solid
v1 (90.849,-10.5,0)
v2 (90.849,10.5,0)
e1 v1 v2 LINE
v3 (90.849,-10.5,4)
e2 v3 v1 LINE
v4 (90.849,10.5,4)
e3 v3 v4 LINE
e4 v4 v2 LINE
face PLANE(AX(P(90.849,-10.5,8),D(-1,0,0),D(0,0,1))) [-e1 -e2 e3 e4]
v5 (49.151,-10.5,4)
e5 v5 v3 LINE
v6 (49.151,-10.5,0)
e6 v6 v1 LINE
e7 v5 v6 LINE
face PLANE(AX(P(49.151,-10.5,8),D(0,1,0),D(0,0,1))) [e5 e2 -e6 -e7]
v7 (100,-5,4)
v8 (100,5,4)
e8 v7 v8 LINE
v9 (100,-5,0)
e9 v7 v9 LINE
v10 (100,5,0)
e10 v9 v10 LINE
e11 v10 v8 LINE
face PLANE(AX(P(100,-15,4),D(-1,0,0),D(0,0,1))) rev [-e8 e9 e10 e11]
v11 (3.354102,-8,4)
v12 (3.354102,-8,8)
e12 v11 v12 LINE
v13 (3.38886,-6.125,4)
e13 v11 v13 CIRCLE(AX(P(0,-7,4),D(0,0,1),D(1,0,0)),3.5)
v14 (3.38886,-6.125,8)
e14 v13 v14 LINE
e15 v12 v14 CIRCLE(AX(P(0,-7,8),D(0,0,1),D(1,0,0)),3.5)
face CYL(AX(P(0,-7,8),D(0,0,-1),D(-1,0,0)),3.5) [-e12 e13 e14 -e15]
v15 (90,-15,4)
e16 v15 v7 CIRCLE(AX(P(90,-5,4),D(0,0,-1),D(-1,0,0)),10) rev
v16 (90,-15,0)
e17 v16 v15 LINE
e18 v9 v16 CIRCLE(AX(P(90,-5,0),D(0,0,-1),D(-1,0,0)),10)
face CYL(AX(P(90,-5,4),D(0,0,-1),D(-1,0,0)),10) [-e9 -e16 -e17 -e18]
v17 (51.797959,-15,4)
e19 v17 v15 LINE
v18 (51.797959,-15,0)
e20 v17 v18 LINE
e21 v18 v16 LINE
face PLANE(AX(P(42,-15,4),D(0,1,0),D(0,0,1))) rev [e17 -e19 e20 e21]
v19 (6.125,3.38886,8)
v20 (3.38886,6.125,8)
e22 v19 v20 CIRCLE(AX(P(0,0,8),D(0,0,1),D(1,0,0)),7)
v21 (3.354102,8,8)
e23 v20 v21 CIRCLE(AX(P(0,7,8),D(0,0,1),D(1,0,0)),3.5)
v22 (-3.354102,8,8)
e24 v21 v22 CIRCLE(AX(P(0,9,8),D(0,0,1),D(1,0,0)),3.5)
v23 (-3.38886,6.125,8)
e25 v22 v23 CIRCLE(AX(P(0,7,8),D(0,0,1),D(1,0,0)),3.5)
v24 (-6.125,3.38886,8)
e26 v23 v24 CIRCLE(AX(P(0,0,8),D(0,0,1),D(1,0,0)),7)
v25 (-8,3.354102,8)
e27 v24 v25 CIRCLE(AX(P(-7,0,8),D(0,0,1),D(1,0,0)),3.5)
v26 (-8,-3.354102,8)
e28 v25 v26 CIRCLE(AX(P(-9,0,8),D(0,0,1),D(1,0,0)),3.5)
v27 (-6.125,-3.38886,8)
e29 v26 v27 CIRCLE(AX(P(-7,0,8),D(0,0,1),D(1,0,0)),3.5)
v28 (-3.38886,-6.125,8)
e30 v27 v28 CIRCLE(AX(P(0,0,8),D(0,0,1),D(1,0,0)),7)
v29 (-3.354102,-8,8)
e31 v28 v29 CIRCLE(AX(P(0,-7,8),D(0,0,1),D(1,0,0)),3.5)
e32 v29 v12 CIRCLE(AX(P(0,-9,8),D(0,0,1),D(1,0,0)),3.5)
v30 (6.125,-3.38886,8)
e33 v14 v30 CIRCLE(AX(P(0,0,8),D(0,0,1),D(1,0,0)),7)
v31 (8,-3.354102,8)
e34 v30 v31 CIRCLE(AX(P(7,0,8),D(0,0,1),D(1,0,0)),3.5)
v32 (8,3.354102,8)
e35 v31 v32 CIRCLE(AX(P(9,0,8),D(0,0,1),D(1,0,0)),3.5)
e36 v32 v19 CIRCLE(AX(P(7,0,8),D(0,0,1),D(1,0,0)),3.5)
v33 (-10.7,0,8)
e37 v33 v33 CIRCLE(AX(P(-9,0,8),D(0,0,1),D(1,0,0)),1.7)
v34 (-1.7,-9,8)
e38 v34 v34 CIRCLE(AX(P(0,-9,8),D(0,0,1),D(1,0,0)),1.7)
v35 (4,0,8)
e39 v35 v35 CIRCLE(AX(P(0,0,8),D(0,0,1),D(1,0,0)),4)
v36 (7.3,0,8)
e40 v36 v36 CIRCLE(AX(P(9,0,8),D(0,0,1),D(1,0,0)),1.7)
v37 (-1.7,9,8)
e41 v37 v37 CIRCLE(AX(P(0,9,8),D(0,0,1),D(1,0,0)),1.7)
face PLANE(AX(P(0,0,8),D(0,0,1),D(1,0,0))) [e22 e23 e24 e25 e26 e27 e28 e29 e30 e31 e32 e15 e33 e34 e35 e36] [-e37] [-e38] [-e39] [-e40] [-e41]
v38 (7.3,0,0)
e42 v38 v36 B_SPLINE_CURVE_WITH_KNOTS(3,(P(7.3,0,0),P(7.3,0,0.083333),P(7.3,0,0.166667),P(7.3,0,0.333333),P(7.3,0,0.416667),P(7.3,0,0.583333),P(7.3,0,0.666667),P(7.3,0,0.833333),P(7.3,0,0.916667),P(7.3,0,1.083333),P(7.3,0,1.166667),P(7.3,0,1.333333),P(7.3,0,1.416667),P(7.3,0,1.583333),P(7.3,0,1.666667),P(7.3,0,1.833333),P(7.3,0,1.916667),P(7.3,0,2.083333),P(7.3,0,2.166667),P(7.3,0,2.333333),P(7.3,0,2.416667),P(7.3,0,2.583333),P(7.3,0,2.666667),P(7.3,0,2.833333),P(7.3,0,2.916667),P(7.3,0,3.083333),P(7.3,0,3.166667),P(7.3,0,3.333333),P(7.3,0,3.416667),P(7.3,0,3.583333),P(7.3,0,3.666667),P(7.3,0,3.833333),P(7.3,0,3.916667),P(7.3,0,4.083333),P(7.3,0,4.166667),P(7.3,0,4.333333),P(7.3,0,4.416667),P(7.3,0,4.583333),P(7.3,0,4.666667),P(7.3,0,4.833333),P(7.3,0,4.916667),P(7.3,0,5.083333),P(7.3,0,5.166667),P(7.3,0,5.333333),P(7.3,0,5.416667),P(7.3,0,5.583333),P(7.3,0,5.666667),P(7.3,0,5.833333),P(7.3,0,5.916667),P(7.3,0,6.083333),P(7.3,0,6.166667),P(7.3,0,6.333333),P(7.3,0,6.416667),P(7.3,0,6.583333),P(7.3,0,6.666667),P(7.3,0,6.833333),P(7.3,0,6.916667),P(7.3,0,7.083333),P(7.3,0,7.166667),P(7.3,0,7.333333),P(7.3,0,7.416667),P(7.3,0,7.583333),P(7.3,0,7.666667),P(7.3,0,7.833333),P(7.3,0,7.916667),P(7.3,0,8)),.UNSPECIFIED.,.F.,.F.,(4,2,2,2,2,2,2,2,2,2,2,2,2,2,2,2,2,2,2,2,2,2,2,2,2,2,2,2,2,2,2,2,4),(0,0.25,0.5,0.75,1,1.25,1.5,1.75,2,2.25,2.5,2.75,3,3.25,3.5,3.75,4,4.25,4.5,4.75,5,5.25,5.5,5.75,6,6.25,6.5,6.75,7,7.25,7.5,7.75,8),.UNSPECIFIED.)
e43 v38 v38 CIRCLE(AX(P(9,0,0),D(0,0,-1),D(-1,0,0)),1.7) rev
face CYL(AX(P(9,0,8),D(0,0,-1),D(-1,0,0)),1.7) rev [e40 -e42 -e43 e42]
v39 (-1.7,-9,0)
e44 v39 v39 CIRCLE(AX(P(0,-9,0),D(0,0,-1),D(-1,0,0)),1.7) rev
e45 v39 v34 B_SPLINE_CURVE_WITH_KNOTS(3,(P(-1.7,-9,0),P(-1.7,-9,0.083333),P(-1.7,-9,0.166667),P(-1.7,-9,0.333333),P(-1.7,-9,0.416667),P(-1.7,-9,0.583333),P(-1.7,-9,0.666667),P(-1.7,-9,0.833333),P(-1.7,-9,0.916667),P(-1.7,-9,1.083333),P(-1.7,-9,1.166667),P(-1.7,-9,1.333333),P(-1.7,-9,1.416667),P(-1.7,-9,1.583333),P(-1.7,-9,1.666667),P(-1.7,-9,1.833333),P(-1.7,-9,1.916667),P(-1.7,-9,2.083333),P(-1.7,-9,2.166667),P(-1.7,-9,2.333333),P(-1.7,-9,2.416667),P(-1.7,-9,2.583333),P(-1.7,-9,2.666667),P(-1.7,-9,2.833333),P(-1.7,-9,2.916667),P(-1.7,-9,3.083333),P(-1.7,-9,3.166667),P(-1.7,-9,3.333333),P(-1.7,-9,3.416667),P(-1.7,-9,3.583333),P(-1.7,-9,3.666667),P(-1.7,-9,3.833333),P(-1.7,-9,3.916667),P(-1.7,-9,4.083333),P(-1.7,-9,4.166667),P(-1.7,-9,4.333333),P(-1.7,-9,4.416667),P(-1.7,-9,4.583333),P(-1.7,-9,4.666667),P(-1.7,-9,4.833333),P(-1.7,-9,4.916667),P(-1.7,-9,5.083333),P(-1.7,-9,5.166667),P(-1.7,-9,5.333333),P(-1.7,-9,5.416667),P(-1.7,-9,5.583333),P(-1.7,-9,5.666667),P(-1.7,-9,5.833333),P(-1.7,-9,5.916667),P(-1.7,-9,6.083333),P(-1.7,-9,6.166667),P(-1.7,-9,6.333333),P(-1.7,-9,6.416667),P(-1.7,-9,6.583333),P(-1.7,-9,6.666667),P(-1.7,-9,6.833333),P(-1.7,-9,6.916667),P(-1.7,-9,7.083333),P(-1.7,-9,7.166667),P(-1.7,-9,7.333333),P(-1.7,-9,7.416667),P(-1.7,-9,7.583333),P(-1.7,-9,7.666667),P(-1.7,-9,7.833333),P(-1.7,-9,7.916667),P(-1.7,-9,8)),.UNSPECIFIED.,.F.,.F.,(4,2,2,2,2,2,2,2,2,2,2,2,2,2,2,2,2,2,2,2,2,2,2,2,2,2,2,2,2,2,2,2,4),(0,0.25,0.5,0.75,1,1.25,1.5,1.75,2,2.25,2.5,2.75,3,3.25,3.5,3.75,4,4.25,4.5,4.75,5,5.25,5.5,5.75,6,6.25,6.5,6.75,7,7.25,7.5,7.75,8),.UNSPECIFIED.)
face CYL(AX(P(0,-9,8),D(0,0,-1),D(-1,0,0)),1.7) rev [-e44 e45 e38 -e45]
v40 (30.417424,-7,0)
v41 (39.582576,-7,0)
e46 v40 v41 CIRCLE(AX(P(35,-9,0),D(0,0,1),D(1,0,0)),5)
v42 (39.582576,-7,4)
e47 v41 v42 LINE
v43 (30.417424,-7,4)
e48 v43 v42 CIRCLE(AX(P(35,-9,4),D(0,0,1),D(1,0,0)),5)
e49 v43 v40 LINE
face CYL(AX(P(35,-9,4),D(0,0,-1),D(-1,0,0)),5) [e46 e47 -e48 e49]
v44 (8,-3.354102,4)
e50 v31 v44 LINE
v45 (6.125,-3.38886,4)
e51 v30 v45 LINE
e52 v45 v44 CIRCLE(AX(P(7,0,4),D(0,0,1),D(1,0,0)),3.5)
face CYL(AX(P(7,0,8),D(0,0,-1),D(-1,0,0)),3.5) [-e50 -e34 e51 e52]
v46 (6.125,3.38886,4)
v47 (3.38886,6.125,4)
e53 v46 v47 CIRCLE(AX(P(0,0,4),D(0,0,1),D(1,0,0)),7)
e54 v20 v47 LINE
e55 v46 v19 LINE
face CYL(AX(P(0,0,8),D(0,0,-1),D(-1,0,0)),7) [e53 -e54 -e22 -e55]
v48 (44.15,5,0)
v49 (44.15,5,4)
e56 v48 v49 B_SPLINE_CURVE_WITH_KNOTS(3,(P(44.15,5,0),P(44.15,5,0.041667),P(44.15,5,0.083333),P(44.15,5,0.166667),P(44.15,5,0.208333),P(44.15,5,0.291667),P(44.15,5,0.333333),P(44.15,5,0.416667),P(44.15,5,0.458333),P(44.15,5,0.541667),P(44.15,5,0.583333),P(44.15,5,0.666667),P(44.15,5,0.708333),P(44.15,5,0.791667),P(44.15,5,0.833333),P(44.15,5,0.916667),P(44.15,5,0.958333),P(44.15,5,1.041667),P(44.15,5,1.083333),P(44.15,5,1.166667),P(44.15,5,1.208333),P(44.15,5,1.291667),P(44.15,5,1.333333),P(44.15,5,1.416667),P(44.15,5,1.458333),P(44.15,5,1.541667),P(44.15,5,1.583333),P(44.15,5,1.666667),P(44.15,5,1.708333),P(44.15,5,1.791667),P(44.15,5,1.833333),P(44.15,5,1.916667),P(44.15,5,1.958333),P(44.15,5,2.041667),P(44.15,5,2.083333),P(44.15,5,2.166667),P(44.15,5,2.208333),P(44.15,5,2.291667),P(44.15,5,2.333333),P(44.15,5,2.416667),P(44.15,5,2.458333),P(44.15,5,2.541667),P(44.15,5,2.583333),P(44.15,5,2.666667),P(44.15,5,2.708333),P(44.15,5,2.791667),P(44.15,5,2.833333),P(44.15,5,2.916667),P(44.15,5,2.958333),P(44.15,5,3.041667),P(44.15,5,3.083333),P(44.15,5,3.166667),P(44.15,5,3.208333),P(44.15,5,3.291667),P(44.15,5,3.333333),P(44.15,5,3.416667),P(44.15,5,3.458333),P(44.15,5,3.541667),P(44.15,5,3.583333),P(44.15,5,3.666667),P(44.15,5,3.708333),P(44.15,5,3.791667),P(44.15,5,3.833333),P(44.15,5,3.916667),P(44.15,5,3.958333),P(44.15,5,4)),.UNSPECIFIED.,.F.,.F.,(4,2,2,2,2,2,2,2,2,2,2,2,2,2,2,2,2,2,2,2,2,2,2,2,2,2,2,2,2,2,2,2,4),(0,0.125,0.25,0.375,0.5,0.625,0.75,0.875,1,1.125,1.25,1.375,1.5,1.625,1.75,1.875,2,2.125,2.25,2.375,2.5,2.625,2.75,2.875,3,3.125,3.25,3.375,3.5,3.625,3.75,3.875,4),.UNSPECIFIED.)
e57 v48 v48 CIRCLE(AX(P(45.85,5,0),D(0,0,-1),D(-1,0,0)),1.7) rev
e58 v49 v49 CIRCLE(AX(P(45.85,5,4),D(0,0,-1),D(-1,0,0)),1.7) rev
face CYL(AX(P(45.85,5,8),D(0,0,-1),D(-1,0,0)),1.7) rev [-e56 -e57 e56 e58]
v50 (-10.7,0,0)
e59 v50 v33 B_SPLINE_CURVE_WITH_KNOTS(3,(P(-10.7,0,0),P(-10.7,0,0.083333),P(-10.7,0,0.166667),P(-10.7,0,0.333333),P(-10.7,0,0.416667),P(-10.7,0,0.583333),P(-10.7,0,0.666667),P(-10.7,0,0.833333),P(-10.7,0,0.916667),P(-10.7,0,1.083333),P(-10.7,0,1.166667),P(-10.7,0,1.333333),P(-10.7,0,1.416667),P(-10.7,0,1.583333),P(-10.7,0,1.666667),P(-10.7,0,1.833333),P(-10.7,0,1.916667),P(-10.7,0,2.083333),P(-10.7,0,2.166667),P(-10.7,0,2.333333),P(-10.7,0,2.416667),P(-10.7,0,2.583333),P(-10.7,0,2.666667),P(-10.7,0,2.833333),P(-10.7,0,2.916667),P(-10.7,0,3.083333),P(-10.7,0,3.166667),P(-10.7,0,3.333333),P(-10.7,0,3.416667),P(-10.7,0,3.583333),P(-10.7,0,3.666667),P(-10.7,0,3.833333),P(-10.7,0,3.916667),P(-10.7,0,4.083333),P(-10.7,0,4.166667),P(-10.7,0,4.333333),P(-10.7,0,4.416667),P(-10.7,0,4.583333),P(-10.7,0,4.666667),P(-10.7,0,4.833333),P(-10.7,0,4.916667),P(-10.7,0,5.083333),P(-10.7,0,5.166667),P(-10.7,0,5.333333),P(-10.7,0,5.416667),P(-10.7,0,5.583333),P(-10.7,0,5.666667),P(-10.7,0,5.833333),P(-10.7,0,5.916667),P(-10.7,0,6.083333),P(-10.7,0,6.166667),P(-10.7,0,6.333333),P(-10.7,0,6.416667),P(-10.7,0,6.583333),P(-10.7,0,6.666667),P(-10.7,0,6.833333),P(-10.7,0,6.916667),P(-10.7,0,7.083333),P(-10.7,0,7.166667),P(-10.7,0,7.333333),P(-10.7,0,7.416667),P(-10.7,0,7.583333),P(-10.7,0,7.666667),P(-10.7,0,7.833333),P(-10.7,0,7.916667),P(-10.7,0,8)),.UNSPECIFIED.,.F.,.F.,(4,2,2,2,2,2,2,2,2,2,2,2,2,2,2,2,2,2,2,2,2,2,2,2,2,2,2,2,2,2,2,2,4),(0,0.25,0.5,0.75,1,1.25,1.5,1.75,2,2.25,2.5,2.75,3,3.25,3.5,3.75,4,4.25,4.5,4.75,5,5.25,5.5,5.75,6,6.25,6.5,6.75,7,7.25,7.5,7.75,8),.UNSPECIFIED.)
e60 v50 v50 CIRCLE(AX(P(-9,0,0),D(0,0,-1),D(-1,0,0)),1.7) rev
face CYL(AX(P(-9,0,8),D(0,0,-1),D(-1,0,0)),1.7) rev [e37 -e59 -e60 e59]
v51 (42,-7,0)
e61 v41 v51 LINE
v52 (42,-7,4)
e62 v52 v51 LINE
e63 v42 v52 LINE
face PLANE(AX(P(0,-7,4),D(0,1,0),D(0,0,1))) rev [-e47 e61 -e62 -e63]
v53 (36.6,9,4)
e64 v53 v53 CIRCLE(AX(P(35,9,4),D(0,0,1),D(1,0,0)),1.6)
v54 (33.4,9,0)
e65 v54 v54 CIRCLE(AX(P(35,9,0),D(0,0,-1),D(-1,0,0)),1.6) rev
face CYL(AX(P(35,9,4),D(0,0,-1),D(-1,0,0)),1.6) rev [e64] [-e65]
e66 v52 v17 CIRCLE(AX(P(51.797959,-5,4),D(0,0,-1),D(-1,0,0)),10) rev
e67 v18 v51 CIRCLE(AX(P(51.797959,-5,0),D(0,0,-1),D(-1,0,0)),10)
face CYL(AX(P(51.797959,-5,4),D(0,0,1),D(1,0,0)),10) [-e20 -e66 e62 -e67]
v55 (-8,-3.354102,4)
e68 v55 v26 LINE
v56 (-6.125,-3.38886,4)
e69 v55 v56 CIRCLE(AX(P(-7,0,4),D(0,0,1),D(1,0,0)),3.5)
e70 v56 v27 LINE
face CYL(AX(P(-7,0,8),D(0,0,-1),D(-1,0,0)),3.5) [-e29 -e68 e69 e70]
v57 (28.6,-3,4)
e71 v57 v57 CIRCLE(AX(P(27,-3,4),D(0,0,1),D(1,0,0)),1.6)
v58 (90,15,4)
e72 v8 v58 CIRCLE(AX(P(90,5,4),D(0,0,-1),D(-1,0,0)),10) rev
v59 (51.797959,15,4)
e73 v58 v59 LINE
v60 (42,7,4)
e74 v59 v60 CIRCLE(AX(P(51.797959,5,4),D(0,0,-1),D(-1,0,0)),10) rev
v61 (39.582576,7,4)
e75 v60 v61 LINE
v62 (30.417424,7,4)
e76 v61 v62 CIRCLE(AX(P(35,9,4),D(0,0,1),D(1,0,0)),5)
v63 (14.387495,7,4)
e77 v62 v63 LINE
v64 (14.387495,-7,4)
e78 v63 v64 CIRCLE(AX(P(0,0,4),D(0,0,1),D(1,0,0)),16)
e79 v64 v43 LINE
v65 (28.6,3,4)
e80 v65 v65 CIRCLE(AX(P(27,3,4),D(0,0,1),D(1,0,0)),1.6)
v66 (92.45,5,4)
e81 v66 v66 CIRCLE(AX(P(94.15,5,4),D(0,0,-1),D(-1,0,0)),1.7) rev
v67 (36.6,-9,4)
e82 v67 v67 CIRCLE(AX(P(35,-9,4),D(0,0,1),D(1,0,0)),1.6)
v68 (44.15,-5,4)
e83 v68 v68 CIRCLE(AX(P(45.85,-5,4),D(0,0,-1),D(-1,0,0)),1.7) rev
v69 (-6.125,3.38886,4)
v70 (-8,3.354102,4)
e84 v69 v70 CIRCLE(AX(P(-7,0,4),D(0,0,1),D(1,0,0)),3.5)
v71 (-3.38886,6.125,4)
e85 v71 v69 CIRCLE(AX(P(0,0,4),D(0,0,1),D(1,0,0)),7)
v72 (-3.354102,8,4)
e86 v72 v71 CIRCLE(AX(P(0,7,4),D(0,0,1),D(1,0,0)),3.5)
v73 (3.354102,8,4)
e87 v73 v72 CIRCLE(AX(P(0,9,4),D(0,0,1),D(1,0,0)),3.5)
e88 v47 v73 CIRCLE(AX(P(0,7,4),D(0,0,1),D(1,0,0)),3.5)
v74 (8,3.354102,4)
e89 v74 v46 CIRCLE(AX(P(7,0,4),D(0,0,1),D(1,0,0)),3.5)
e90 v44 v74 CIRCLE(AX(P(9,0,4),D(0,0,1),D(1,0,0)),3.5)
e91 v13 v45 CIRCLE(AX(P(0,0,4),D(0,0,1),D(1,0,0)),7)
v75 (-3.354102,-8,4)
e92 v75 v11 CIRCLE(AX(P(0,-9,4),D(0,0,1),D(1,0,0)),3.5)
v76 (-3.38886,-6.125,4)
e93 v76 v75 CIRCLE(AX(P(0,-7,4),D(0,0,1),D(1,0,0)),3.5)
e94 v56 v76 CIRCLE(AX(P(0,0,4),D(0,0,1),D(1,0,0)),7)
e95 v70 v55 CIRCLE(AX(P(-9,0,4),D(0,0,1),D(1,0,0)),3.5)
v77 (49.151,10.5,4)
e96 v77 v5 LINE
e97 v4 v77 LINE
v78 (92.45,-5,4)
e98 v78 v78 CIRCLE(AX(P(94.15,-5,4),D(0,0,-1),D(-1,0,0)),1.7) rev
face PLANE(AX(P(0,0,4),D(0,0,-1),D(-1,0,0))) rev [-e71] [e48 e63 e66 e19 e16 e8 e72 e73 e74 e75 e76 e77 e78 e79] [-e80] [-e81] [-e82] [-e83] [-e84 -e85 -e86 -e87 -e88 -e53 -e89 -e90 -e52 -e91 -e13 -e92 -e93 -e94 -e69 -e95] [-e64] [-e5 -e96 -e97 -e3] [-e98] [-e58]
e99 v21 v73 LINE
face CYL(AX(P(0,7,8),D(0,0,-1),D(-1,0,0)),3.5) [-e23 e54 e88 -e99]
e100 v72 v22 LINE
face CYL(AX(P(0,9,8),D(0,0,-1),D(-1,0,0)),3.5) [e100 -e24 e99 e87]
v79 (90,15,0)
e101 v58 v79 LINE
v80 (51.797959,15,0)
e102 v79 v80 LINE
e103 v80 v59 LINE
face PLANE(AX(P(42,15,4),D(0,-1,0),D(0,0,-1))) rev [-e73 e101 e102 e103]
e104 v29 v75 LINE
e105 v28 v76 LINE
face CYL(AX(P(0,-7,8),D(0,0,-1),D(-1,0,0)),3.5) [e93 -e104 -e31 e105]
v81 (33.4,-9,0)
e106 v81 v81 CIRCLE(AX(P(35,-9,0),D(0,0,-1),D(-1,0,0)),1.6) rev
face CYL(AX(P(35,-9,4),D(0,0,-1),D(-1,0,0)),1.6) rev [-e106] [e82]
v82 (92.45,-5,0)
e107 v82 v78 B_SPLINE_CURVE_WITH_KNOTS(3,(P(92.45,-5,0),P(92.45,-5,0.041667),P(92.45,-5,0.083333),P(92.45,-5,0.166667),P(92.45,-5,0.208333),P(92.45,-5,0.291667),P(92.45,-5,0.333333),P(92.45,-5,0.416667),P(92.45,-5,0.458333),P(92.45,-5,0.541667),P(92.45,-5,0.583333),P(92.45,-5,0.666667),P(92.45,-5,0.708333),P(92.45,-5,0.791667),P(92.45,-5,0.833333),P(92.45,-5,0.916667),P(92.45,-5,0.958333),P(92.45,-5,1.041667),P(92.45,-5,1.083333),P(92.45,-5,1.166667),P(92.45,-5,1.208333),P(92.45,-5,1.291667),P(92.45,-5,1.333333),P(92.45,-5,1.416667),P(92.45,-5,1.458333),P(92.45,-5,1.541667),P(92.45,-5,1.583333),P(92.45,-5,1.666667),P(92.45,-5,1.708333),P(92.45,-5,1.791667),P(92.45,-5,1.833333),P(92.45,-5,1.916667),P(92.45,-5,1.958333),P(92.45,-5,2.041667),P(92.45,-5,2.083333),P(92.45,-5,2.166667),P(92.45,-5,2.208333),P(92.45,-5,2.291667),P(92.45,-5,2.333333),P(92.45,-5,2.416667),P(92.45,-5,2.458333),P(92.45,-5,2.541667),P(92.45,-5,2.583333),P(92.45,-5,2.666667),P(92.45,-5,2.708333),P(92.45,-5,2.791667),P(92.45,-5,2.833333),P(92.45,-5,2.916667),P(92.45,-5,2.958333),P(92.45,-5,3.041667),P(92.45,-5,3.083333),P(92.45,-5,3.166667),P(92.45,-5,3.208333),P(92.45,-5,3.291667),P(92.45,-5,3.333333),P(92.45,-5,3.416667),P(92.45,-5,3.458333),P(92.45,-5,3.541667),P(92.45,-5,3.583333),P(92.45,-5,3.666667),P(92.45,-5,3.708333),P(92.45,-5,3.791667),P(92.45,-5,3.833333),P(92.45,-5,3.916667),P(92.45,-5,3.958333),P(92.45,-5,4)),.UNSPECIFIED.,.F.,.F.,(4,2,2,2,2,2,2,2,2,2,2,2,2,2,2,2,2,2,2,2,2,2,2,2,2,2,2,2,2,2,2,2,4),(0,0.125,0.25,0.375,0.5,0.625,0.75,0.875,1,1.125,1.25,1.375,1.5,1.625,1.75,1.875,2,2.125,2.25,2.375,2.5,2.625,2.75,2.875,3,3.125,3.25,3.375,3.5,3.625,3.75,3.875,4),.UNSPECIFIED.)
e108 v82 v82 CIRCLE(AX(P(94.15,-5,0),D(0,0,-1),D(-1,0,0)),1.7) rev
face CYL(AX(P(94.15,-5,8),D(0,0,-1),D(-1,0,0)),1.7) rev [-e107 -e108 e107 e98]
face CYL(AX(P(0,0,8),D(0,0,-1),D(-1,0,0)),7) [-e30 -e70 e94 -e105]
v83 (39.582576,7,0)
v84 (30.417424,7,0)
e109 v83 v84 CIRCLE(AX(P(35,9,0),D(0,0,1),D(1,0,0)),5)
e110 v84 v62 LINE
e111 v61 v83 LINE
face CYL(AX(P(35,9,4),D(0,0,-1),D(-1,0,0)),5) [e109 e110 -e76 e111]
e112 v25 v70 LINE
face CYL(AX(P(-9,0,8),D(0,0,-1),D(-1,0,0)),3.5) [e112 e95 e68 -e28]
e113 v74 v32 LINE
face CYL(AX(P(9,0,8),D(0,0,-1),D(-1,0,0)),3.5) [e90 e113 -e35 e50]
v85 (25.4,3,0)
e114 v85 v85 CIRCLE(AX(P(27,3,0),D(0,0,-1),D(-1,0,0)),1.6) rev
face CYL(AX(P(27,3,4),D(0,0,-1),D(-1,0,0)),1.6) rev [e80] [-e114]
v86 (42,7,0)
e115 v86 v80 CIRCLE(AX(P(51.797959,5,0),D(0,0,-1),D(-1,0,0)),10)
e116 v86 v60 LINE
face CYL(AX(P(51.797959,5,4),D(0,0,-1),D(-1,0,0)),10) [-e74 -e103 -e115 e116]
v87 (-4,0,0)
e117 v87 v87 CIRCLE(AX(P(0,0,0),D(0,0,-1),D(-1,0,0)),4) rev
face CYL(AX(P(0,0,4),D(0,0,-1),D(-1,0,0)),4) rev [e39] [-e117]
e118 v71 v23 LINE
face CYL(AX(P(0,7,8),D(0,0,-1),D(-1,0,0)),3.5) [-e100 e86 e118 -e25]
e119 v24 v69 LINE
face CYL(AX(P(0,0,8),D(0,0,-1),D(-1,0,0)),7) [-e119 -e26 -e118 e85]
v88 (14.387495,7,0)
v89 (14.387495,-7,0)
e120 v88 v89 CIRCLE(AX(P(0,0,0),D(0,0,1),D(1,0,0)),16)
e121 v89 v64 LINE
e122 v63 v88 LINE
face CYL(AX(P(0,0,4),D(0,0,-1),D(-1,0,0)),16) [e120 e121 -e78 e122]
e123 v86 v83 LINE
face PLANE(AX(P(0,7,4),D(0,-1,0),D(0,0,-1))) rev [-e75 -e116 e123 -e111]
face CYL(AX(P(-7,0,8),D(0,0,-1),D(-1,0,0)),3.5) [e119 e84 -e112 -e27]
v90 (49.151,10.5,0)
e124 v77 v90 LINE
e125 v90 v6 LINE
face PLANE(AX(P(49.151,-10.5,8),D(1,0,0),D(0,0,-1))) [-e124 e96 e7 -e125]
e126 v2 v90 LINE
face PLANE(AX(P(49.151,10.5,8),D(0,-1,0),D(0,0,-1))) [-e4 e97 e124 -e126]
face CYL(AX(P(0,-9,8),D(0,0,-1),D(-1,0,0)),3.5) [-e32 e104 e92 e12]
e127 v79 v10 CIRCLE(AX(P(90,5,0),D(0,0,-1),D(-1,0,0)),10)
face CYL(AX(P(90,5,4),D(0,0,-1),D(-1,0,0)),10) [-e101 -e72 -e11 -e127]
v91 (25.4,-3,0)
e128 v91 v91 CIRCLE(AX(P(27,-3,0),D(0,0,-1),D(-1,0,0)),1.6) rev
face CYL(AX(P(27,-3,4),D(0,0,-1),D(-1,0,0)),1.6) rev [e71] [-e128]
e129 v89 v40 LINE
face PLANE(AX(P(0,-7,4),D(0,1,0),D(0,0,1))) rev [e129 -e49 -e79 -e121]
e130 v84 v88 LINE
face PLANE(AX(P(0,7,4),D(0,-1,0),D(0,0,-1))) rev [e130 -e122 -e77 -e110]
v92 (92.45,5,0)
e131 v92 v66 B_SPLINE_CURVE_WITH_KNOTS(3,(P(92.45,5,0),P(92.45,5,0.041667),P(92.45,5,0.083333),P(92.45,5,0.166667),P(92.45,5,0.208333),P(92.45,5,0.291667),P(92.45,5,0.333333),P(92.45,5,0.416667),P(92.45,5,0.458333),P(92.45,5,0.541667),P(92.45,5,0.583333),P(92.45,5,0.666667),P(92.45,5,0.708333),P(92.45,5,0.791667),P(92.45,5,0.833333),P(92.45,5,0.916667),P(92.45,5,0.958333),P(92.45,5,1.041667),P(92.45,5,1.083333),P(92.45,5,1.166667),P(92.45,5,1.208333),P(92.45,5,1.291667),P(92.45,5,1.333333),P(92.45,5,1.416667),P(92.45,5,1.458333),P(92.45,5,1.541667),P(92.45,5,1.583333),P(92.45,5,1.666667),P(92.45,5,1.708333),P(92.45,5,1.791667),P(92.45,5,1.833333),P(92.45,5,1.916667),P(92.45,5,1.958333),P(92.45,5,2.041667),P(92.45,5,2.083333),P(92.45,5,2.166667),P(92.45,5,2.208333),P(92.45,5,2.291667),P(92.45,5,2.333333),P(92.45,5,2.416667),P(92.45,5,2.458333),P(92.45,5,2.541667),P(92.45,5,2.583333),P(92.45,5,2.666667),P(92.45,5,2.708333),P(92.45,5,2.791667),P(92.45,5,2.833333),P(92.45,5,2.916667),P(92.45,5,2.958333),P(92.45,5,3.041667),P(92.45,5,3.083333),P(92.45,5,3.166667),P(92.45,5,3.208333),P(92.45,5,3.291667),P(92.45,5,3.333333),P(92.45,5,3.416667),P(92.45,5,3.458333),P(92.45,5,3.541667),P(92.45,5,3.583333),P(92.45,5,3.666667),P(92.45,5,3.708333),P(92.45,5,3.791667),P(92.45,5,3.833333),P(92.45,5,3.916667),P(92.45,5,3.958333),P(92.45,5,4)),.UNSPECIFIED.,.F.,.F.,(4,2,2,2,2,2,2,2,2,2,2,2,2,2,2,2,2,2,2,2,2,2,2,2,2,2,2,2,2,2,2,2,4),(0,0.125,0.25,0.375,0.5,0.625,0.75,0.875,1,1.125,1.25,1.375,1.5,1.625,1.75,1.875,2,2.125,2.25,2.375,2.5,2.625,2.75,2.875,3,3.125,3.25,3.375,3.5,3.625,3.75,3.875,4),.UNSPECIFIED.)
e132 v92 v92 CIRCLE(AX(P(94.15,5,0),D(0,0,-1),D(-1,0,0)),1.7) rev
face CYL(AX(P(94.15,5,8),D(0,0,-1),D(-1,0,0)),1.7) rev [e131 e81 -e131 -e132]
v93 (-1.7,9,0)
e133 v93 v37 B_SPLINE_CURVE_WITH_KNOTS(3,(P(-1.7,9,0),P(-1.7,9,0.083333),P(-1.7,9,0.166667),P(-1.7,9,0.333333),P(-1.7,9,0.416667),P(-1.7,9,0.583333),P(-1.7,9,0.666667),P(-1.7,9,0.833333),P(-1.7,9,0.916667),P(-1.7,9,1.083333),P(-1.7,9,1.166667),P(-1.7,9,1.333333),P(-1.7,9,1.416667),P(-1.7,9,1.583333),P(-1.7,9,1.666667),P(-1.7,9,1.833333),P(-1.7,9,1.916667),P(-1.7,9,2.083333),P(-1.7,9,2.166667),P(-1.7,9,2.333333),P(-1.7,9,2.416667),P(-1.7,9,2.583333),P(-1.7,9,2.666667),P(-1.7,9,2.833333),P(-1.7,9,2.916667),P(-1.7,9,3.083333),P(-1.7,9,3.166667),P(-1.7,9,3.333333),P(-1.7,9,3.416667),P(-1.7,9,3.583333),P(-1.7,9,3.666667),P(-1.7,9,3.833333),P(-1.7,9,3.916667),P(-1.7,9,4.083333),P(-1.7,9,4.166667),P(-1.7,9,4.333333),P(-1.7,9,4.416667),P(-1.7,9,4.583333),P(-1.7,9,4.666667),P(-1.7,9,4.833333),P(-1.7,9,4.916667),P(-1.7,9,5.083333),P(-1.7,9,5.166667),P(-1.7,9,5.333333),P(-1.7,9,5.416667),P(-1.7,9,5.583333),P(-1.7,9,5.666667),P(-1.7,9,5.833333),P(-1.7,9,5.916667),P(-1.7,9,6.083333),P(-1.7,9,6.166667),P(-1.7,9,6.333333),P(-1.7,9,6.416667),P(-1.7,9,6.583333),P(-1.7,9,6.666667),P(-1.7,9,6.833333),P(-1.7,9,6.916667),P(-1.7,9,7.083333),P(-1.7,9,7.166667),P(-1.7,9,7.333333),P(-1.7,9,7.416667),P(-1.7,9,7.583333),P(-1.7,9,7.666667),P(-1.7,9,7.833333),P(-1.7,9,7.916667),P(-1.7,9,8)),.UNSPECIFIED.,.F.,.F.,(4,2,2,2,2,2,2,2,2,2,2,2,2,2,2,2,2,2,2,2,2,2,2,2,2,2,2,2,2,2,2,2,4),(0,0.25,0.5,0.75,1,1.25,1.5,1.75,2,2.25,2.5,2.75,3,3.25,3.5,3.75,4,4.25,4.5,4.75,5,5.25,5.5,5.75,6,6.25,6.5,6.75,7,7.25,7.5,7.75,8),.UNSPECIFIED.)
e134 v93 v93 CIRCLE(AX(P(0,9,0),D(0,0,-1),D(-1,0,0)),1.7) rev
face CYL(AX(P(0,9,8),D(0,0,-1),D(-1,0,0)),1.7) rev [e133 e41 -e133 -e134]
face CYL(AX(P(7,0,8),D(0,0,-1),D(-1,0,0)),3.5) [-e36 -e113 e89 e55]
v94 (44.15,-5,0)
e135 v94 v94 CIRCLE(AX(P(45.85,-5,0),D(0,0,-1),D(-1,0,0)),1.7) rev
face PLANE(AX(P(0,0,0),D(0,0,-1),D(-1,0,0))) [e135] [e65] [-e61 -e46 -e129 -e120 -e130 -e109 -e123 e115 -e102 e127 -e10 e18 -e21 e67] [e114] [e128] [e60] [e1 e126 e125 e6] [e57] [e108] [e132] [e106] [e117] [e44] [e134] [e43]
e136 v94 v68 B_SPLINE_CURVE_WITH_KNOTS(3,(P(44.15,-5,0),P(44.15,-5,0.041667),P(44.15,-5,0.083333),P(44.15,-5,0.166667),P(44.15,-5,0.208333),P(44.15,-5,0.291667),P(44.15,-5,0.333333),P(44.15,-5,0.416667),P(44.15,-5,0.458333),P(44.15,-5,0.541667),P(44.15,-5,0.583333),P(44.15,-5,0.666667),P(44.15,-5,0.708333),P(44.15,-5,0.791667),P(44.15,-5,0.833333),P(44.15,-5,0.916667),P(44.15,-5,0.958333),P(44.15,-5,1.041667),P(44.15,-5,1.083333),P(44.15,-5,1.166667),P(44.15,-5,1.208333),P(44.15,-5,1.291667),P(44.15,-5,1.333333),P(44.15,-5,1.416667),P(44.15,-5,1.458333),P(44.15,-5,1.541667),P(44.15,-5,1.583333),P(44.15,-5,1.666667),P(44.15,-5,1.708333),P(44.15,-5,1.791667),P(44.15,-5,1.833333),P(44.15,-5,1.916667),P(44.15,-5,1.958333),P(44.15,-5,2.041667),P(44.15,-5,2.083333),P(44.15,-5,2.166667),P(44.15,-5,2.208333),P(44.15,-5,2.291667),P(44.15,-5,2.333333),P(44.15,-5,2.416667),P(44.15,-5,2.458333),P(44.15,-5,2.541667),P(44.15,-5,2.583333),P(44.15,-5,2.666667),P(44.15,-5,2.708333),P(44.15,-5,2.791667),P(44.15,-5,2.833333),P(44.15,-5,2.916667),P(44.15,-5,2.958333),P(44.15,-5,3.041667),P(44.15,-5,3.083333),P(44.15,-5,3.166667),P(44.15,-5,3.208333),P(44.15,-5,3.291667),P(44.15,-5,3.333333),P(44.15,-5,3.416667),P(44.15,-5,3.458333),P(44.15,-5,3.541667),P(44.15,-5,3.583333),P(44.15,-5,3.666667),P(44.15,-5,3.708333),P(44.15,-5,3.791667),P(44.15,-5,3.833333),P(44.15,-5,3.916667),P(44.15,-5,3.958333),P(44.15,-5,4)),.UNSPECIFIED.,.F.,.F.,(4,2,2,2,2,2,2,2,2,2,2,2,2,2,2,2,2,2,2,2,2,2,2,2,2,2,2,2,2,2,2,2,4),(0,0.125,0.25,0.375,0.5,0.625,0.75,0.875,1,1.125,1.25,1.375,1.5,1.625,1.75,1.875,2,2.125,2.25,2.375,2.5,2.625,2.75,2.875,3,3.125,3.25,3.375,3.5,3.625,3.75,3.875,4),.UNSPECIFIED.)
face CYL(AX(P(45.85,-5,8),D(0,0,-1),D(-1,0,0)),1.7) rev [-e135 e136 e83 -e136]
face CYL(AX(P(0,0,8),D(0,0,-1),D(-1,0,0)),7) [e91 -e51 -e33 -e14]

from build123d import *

# Parameters (mm, degrees)
MAIN_WEB_PROFILE_W                             = 60
MAIN_WEB_PROFILE_H                             = 14
MAIN_WEB_DEPTH                                 = 4
SHOULDER_HORN_FLANGE_PROFILE_R                 = 16
SHOULDER_HORN_FLANGE_DEPTH                     = 4
ELBOW_SERVO_MOUNT_PROFILE_W                    = 48
ELBOW_SERVO_MOUNT_PROFILE_H                    = 28
ELBOW_SERVO_MOUNT_DEPTH                        = 4
SG90_BODY_CLEARANCE_START                      = -5
SG90_BODY_CLEARANCE_PROFILE_W                  = 23.8
SG90_BODY_CLEARANCE_PROFILE_H                  = 13
SG90_BODY_CLEARANCE_DEPTH                      = 97.49863387
ELBOW_TAB_FASTENERS_START                      = -50
ELBOW_TAB_FASTENERS_PROFILE_R                  = 1.3
ELBOW_TAB_FASTENERS_DEPTH                      = 142.49863387
SHOULDER_CENTER_SCREW_ACCESS_START             = -50
SHOULDER_CENTER_SCREW_ACCESS_PROFILE_R         = 4
SHOULDER_CENTER_SCREW_ACCESS_DEPTH             = 142.49863387
CABLE_TIE_HOLES_START                          = -50
CABLE_TIE_HOLES_PROFILE_R                      = 1.6
CABLE_TIE_HOLES_DEPTH                          = 142.49863387
PASSIVE_LOWER_MOUNT_BOSS_PROFILE_R             = 5
PASSIVE_LOWER_MOUNT_BOSS_DEPTH                 = 4
PASSIVE_UPPER_MOUNT_BOSS_PROFILE_R             = 5
PASSIVE_UPPER_MOUNT_BOSS_DEPTH                 = 4
PASSIVE_CHEEK_STANDOFFS_START                  = -50
PASSIVE_CHEEK_STANDOFFS_PROFILE_R              = 1.6
PASSIVE_CHEEK_STANDOFFS_DEPTH                  = 142.49863387
SHOULDER_DOWEL_SUPPORT_HUB_START               = 4
SHOULDER_DOWEL_SUPPORT_HUB_PROFILE_R           = 7
SHOULDER_DOWEL_SUPPORT_HUB_PROFILE_R_2         = 4
SHOULDER_DOWEL_SUPPORT_HUB_DEPTH               = 4
RAISED_M3_WASHER_SEATS_HEIGHT8_START           = 4
RAISED_M3_WASHER_SEATS_PCD14_PROFILE_R         = 3.5
RAISED_M3_WASHER_SEATS_HEIGHT8_DEPTH           = 4
RESTORE_SHOULDER_SLEEVE_BORE_START             = -50
RESTORE_SHOULDER_SLEEVE_BORE_PROFILE_R         = 4
RESTORE_SHOULDER_SLEEVE_BORE_DEPTH             = 142.760557976
FILLET1_R                                      = 7.5
LARGER_ELBOW_SERVO_MOUNT_REPLACES_SG_2_W       = 58
LARGER_ELBOW_SERVO_MOUNT_REPLACES_SG_2_H       = 30
LARGER_ELBOW_SERVO_MOUNT_REPLACES_SG90_O_DEPTH = 4
FILLET2_R                                      = 10
OWNED_MG996R_ELBOW_BODY_WINDOW_START           = -5
OWNED_MG996R_ELBOW_BODY_WINDOW_PROFILE_W       = 41.698
OWNED_MG996R_ELBOW_BODY_WINDOW_PROFILE_H       = 21
OWNED_MG996R_ELBOW_BODY_WINDOW_DEPTH           = 107.587400794
OWNED_MG996R_ELBOW_M3_EAR_HOLES_START          = -50
OWNED_MG996R_ELBOW_M3_EAR_HOLES_PROFILE_R      = 1.7
OWNED_MG996R_ELBOW_M3_EAR_HOLES_DEPTH          = 152.587400794
PRINTED_HUB_M3_WASHER_SEATS_PCD18_START        = 4
PRINTED_HUB_WASHER_SEATS_PCD18_PROFILE_R       = 3.5
PRINTED_HUB_M3_WASHER_SEATS_PCD18_DEPTH        = 4
PRINTED_HUB_M3_CLEARANCE_PCD18_START           = -50
PRINTED_HUB_M3_CLEARANCE_PCD18_PROFILE_R       = 1.7
PRINTED_HUB_M3_CLEARANCE_PCD18_DEPTH           = 152.587400794


with BuildPart() as part:
    # Main_web_profile → Main_web (new body)
    with BuildSketch(Plane.XY):
        with Locations((30, 0)):
            Rectangle(MAIN_WEB_PROFILE_W, MAIN_WEB_PROFILE_H)
    extrude(amount=MAIN_WEB_DEPTH)

    # Shoulder_horn_flange_profile → Shoulder_horn_flange (add)
    with BuildSketch(Plane.XY):
        Circle(SHOULDER_HORN_FLANGE_PROFILE_R)
    extrude(amount=SHOULDER_HORN_FLANGE_DEPTH)

    # Elbow_servo_mount_profile → Elbow_servo_mount (add)
    with BuildSketch(Plane.XY):
        with Locations((66, 0)):
            Rectangle(ELBOW_SERVO_MOUNT_PROFILE_W, ELBOW_SERVO_MOUNT_PROFILE_H)
    extrude(amount=ELBOW_SERVO_MOUNT_DEPTH)

    # SG90_body_clearance_profile → SG90_body_clearance (cut, through all)
    with BuildSketch(Plane.XY.offset(SG90_BODY_CLEARANCE_START)):
        with Locations((65.5, 0)):
            Rectangle(SG90_BODY_CLEARANCE_PROFILE_W, SG90_BODY_CLEARANCE_PROFILE_H)
    extrude(amount=SG90_BODY_CLEARANCE_DEPTH, mode=Mode.SUBTRACT)

    # Elbow_tab_fasteners_profile → Elbow_tab_fasteners (cut, through all)
    with BuildSketch(Plane.XY.offset(ELBOW_TAB_FASTENERS_START)):
        with Locations(Location((51, 0, 0), (0, 0, 180))):
            Circle(ELBOW_TAB_FASTENERS_PROFILE_R)
        with Locations(Location((80, 0, 0), (0, 0, 180))):
            Circle(ELBOW_TAB_FASTENERS_PROFILE_R)
    extrude(amount=ELBOW_TAB_FASTENERS_DEPTH, mode=Mode.SUBTRACT)

    # Shoulder_center_screw_access_profile → Shoulder_center_screw_access (cut, through all)
    with BuildSketch(Plane.XY.offset(SHOULDER_CENTER_SCREW_ACCESS_START)):
        with Locations(Location((0, 0, 0), (0, 0, 180))):
            Circle(SHOULDER_CENTER_SCREW_ACCESS_PROFILE_R)
    extrude(amount=SHOULDER_CENTER_SCREW_ACCESS_DEPTH, mode=Mode.SUBTRACT)

    # Cable_tie_holes_profile → Cable_tie_holes (cut, through all)
    with BuildSketch(Plane.XY.offset(CABLE_TIE_HOLES_START)):
        with Locations(Location((27, -3, 0), (0, 0, 180))):
            Circle(CABLE_TIE_HOLES_PROFILE_R)
        with Locations(Location((27, 3, 0), (0, 0, 180))):
            Circle(CABLE_TIE_HOLES_PROFILE_R)
    extrude(amount=CABLE_TIE_HOLES_DEPTH, mode=Mode.SUBTRACT)

    # Passive_lower_mount_boss_profile → Passive_lower_mount_boss (add)
    with BuildSketch(Plane.XY):
        with Locations((35, -9)):
            Circle(PASSIVE_LOWER_MOUNT_BOSS_PROFILE_R)
    extrude(amount=PASSIVE_LOWER_MOUNT_BOSS_DEPTH)

    # Passive_upper_mount_boss_profile → Passive_upper_mount_boss (add)
    with BuildSketch(Plane.XY):
        with Locations((35, 9)):
            Circle(PASSIVE_UPPER_MOUNT_BOSS_PROFILE_R)
    extrude(amount=PASSIVE_UPPER_MOUNT_BOSS_DEPTH)

    # Passive_cheek_standoffs_profile → Passive_cheek_standoffs (cut, through all)
    with BuildSketch(Plane.XY.offset(PASSIVE_CHEEK_STANDOFFS_START)):
        with Locations(Location((35, -9, 0), (0, 0, 180))):
            Circle(PASSIVE_CHEEK_STANDOFFS_PROFILE_R)
        with Locations(Location((35, 9, 0), (0, 0, 180))):
            Circle(PASSIVE_CHEEK_STANDOFFS_PROFILE_R)
    extrude(amount=PASSIVE_CHEEK_STANDOFFS_DEPTH, mode=Mode.SUBTRACT)

    # Shoulder_dowel_support_hub_profile → Shoulder_dowel_support_hub (add)
    with BuildSketch(Plane.XY.offset(SHOULDER_DOWEL_SUPPORT_HUB_START)):
        Circle(SHOULDER_DOWEL_SUPPORT_HUB_PROFILE_R)
        with Locations(Location((0, 0, 0), (0, 0, 180))):
            Circle(SHOULDER_DOWEL_SUPPORT_HUB_PROFILE_R_2, mode=Mode.SUBTRACT)
    extrude(amount=SHOULDER_DOWEL_SUPPORT_HUB_DEPTH)

    # Raised_M3_washer_seats_PCD14_profile → Raised_M3_washer_seats_height8 (add)
    with BuildSketch(Plane.XY.offset(RAISED_M3_WASHER_SEATS_HEIGHT8_START)):
        with Locations((7, 0)):
            Circle(RAISED_M3_WASHER_SEATS_PCD14_PROFILE_R)
        with Locations((-7, 0)):
            Circle(RAISED_M3_WASHER_SEATS_PCD14_PROFILE_R)
        with Locations((0, 7)):
            Circle(RAISED_M3_WASHER_SEATS_PCD14_PROFILE_R)
        with Locations((0, -7)):
            Circle(RAISED_M3_WASHER_SEATS_PCD14_PROFILE_R)
    extrude(amount=RAISED_M3_WASHER_SEATS_HEIGHT8_DEPTH)

    # Restore_shoulder_sleeve_bore_profile → Restore_shoulder_sleeve_bore (cut, through all)
    with BuildSketch(Plane.XY.offset(RESTORE_SHOULDER_SLEEVE_BORE_START)):
        with Locations(Location((0, 0, 0), (0, 0, 180))):
            Circle(RESTORE_SHOULDER_SLEEVE_BORE_PROFILE_R)
    extrude(amount=RESTORE_SHOULDER_SLEEVE_BORE_DEPTH, mode=Mode.SUBTRACT)

    # Fillet1
    # the kernel refuses this fillet: 7.5 mm, written as the material it takes off along each edge
    with BuildSketch(Plane(origin=(42, -14, -18.708286934), x_dir=(0, 1, 0), z_dir=(0, 0, 1))) as fillet1_piece_1:
        with BuildLine():
            CenterArc((7.5, -7.483314774), FILLET1_R, 93.822553729, 86.177446271)
            Line((0, -7.483314774), (-0.15, -7.483314774))
            Line((-0.15, -7.483314774), (-0.15, 0))
            Line((-0.15, 0), (0, 0.15))
            ThreePointArc((0, 0.15), (3.5, 0.15), (6.99, 0.149666295))
            Line((6.99, 0.149666295), (7, 0))
        make_face()
    extrude(amount=41.416573868, mode=Mode.SUBTRACT)
    with BuildSketch(Plane(origin=(90, -14, -18.75), x_dir=(-1, 0, 0), z_dir=(0, 0, 1)), Plane(origin=(90, 14, -18.75), x_dir=(0, -1, 0), z_dir=(0, 0, 1))) as fillet1_piece_2:
        with BuildLine():
            CenterArc((FILLET1_R, -FILLET1_R), FILLET1_R, 90, 90)
            Line((0, -FILLET1_R), (-FILLET1_R * 0.02, -FILLET1_R))
            Line((-FILLET1_R * 0.02, -FILLET1_R), (-FILLET1_R * 0.02, FILLET1_R * 0.02))
            Line((-FILLET1_R * 0.02, FILLET1_R * 0.02), (FILLET1_R, FILLET1_R * 0.02))
            Line((FILLET1_R, FILLET1_R * 0.02), (FILLET1_R, 0))
        make_face()
    extrude(amount=41.5, mode=Mode.SUBTRACT)
    with BuildSketch(Plane(origin=(42, 14, -18.708286934), x_dir=(0, -1, 0), z_dir=(0, 0, 1))) as fillet1_piece_3:
        with BuildLine():
            CenterArc((7.5, 7.483314774), FILLET1_R, 180, 86.177446271)
            Line((0, 7.483314774), (-0.15, 7.483314774))
            Line((-0.15, 7.483314774), (-0.15, 0))
            Line((-0.15, 0), (0, -0.15))
            ThreePointArc((0, -0.15), (3.5, -0.15), (6.99, -0.149666295))
            Line((6.99, -0.149666295), (7, 0))
        make_face()
    extrude(amount=41.416573868, mode=Mode.SUBTRACT)

    # Larger_elbow_servo_mount_replaces_SG 2 → Larger_elbow_servo_mount_replaces_SG90_o (add)
    with BuildSketch(Plane.XY):
        with Locations((71, 0)):
            Rectangle(LARGER_ELBOW_SERVO_MOUNT_REPLACES_SG_2_W, LARGER_ELBOW_SERVO_MOUNT_REPLACES_SG_2_H)
    extrude(amount=LARGER_ELBOW_SERVO_MOUNT_REPLACES_SG90_O_DEPTH)

    # Fillet2
    # the kernel refuses this fillet: 10 mm, written as the material it takes off along each edge
    with BuildSketch(Plane(origin=(42, 15, -24.494897428), x_dir=(0, -1, 0), z_dir=(0, 0, 1))) as fillet2_piece_1:
        with BuildLine():
            CenterArc((10, 9.797958971), FILLET2_R, 180, 78.463040967)
            Line((0, 9.797958971), (-0.2, 9.797958971))
            Line((-0.2, 9.797958971), (-0.2, 0))
            Line((-0.2, 0), (0, -0.2))
            ThreePointArc((0, -0.2), (4, -0.2), (7.96, -0.195959179))
            Line((7.96, -0.195959179), (8, 0))
        make_face()
    extrude(amount=52.989794856, mode=Mode.SUBTRACT)
    with BuildSketch(Plane(origin=(42, -15, -24.494897428), x_dir=(0, 1, 0), z_dir=(0, 0, 1))) as fillet2_piece_2:
        with BuildLine():
            CenterArc((10, -9.797958971), FILLET2_R, 101.536959033, 78.463040967)
            Line((0, -9.797958971), (-0.2, -9.797958971))
            Line((-0.2, -9.797958971), (-0.2, 0))
            Line((-0.2, 0), (0, 0.2))
            ThreePointArc((0, 0.2), (4, 0.2), (7.96, 0.195959179))
            Line((7.96, 0.195959179), (8, 0))
        make_face()
    extrude(amount=52.989794856, mode=Mode.SUBTRACT)
    with BuildSketch(Plane(origin=(100, -15, -25), x_dir=(0, 1, 0), z_dir=(0, 0, 1)), Plane(origin=(100, 15, -25), x_dir=(-1, 0, 0), z_dir=(0, 0, 1))) as fillet2_piece_3:
        with BuildLine():
            CenterArc((FILLET2_R, FILLET2_R), FILLET2_R, 180, 90)
            Line((0, FILLET2_R), (-FILLET2_R * 0.02, FILLET2_R))
            Line((-FILLET2_R * 0.02, FILLET2_R), (-FILLET2_R * 0.02, -FILLET2_R * 0.02))
            Line((-FILLET2_R * 0.02, -FILLET2_R * 0.02), (FILLET2_R, -FILLET2_R * 0.02))
            Line((FILLET2_R, -FILLET2_R * 0.02), (FILLET2_R, 0))
        make_face()
    extrude(amount=54, mode=Mode.SUBTRACT)

    # Owned_MG996R_elbow_body_window_profile → Owned_MG996R_elbow_body_window (cut, through all)
    with BuildSketch(Plane.XY.offset(OWNED_MG996R_ELBOW_BODY_WINDOW_START)):
        with Locations((70, 0)):
            Rectangle(OWNED_MG996R_ELBOW_BODY_WINDOW_PROFILE_W, OWNED_MG996R_ELBOW_BODY_WINDOW_PROFILE_H)
    extrude(amount=OWNED_MG996R_ELBOW_BODY_WINDOW_DEPTH, mode=Mode.SUBTRACT)

    # Owned_MG996R_elbow_M3_ear_holes_profile → Owned_MG996R_elbow_M3_ear_holes (cut, through all)
    with BuildSketch(Plane.XY.offset(OWNED_MG996R_ELBOW_M3_EAR_HOLES_START)):
        with Locations(Location((45.85, -5, 0), (0, 0, 180))):
            Circle(OWNED_MG996R_ELBOW_M3_EAR_HOLES_PROFILE_R)
        with Locations(Location((45.85, 5, 0), (0, 0, 180))):
            Circle(OWNED_MG996R_ELBOW_M3_EAR_HOLES_PROFILE_R)
        with Locations(Location((94.15, -5, 0), (0, 0, 180))):
            Circle(OWNED_MG996R_ELBOW_M3_EAR_HOLES_PROFILE_R)
        with Locations(Location((94.15, 5, 0), (0, 0, 180))):
            Circle(OWNED_MG996R_ELBOW_M3_EAR_HOLES_PROFILE_R)
    extrude(amount=OWNED_MG996R_ELBOW_M3_EAR_HOLES_DEPTH, mode=Mode.SUBTRACT)

    # Printed_hub_washer_seats_PCD18_profile → Printed_hub_M3_washer_seats_PCD18 (add)
    with BuildSketch(Plane.XY.offset(PRINTED_HUB_M3_WASHER_SEATS_PCD18_START)):
        with Locations((9, 0)):
            Circle(PRINTED_HUB_WASHER_SEATS_PCD18_PROFILE_R)
        with Locations((0, 9)):
            Circle(PRINTED_HUB_WASHER_SEATS_PCD18_PROFILE_R)
        with Locations((-9, 0)):
            Circle(PRINTED_HUB_WASHER_SEATS_PCD18_PROFILE_R)
        with Locations((0, -9)):
            Circle(PRINTED_HUB_WASHER_SEATS_PCD18_PROFILE_R)
    extrude(amount=PRINTED_HUB_M3_WASHER_SEATS_PCD18_DEPTH)

    # Printed_hub_M3_clearance_PCD18_profile → Printed_hub_M3_clearance_PCD18 (cut, through all)
    with BuildSketch(Plane.XY.offset(PRINTED_HUB_M3_CLEARANCE_PCD18_START)):
        with Locations(Location((9, 0, 0), (0, 0, 180))):
            Circle(PRINTED_HUB_M3_CLEARANCE_PCD18_PROFILE_R)
        with Locations(Location((0, 9, 0), (0, 0, 180))):
            Circle(PRINTED_HUB_M3_CLEARANCE_PCD18_PROFILE_R)
        with Locations(Location((-9, 0, 0), (0, 0, 180))):
            Circle(PRINTED_HUB_M3_CLEARANCE_PCD18_PROFILE_R)
        with Locations(Location((0, -9, 0), (0, 0, 180))):
            Circle(PRINTED_HUB_M3_CLEARANCE_PCD18_PROFILE_R)
    extrude(amount=PRINTED_HUB_M3_CLEARANCE_PCD18_DEPTH, mode=Mode.SUBTRACT)


solid = part.part
